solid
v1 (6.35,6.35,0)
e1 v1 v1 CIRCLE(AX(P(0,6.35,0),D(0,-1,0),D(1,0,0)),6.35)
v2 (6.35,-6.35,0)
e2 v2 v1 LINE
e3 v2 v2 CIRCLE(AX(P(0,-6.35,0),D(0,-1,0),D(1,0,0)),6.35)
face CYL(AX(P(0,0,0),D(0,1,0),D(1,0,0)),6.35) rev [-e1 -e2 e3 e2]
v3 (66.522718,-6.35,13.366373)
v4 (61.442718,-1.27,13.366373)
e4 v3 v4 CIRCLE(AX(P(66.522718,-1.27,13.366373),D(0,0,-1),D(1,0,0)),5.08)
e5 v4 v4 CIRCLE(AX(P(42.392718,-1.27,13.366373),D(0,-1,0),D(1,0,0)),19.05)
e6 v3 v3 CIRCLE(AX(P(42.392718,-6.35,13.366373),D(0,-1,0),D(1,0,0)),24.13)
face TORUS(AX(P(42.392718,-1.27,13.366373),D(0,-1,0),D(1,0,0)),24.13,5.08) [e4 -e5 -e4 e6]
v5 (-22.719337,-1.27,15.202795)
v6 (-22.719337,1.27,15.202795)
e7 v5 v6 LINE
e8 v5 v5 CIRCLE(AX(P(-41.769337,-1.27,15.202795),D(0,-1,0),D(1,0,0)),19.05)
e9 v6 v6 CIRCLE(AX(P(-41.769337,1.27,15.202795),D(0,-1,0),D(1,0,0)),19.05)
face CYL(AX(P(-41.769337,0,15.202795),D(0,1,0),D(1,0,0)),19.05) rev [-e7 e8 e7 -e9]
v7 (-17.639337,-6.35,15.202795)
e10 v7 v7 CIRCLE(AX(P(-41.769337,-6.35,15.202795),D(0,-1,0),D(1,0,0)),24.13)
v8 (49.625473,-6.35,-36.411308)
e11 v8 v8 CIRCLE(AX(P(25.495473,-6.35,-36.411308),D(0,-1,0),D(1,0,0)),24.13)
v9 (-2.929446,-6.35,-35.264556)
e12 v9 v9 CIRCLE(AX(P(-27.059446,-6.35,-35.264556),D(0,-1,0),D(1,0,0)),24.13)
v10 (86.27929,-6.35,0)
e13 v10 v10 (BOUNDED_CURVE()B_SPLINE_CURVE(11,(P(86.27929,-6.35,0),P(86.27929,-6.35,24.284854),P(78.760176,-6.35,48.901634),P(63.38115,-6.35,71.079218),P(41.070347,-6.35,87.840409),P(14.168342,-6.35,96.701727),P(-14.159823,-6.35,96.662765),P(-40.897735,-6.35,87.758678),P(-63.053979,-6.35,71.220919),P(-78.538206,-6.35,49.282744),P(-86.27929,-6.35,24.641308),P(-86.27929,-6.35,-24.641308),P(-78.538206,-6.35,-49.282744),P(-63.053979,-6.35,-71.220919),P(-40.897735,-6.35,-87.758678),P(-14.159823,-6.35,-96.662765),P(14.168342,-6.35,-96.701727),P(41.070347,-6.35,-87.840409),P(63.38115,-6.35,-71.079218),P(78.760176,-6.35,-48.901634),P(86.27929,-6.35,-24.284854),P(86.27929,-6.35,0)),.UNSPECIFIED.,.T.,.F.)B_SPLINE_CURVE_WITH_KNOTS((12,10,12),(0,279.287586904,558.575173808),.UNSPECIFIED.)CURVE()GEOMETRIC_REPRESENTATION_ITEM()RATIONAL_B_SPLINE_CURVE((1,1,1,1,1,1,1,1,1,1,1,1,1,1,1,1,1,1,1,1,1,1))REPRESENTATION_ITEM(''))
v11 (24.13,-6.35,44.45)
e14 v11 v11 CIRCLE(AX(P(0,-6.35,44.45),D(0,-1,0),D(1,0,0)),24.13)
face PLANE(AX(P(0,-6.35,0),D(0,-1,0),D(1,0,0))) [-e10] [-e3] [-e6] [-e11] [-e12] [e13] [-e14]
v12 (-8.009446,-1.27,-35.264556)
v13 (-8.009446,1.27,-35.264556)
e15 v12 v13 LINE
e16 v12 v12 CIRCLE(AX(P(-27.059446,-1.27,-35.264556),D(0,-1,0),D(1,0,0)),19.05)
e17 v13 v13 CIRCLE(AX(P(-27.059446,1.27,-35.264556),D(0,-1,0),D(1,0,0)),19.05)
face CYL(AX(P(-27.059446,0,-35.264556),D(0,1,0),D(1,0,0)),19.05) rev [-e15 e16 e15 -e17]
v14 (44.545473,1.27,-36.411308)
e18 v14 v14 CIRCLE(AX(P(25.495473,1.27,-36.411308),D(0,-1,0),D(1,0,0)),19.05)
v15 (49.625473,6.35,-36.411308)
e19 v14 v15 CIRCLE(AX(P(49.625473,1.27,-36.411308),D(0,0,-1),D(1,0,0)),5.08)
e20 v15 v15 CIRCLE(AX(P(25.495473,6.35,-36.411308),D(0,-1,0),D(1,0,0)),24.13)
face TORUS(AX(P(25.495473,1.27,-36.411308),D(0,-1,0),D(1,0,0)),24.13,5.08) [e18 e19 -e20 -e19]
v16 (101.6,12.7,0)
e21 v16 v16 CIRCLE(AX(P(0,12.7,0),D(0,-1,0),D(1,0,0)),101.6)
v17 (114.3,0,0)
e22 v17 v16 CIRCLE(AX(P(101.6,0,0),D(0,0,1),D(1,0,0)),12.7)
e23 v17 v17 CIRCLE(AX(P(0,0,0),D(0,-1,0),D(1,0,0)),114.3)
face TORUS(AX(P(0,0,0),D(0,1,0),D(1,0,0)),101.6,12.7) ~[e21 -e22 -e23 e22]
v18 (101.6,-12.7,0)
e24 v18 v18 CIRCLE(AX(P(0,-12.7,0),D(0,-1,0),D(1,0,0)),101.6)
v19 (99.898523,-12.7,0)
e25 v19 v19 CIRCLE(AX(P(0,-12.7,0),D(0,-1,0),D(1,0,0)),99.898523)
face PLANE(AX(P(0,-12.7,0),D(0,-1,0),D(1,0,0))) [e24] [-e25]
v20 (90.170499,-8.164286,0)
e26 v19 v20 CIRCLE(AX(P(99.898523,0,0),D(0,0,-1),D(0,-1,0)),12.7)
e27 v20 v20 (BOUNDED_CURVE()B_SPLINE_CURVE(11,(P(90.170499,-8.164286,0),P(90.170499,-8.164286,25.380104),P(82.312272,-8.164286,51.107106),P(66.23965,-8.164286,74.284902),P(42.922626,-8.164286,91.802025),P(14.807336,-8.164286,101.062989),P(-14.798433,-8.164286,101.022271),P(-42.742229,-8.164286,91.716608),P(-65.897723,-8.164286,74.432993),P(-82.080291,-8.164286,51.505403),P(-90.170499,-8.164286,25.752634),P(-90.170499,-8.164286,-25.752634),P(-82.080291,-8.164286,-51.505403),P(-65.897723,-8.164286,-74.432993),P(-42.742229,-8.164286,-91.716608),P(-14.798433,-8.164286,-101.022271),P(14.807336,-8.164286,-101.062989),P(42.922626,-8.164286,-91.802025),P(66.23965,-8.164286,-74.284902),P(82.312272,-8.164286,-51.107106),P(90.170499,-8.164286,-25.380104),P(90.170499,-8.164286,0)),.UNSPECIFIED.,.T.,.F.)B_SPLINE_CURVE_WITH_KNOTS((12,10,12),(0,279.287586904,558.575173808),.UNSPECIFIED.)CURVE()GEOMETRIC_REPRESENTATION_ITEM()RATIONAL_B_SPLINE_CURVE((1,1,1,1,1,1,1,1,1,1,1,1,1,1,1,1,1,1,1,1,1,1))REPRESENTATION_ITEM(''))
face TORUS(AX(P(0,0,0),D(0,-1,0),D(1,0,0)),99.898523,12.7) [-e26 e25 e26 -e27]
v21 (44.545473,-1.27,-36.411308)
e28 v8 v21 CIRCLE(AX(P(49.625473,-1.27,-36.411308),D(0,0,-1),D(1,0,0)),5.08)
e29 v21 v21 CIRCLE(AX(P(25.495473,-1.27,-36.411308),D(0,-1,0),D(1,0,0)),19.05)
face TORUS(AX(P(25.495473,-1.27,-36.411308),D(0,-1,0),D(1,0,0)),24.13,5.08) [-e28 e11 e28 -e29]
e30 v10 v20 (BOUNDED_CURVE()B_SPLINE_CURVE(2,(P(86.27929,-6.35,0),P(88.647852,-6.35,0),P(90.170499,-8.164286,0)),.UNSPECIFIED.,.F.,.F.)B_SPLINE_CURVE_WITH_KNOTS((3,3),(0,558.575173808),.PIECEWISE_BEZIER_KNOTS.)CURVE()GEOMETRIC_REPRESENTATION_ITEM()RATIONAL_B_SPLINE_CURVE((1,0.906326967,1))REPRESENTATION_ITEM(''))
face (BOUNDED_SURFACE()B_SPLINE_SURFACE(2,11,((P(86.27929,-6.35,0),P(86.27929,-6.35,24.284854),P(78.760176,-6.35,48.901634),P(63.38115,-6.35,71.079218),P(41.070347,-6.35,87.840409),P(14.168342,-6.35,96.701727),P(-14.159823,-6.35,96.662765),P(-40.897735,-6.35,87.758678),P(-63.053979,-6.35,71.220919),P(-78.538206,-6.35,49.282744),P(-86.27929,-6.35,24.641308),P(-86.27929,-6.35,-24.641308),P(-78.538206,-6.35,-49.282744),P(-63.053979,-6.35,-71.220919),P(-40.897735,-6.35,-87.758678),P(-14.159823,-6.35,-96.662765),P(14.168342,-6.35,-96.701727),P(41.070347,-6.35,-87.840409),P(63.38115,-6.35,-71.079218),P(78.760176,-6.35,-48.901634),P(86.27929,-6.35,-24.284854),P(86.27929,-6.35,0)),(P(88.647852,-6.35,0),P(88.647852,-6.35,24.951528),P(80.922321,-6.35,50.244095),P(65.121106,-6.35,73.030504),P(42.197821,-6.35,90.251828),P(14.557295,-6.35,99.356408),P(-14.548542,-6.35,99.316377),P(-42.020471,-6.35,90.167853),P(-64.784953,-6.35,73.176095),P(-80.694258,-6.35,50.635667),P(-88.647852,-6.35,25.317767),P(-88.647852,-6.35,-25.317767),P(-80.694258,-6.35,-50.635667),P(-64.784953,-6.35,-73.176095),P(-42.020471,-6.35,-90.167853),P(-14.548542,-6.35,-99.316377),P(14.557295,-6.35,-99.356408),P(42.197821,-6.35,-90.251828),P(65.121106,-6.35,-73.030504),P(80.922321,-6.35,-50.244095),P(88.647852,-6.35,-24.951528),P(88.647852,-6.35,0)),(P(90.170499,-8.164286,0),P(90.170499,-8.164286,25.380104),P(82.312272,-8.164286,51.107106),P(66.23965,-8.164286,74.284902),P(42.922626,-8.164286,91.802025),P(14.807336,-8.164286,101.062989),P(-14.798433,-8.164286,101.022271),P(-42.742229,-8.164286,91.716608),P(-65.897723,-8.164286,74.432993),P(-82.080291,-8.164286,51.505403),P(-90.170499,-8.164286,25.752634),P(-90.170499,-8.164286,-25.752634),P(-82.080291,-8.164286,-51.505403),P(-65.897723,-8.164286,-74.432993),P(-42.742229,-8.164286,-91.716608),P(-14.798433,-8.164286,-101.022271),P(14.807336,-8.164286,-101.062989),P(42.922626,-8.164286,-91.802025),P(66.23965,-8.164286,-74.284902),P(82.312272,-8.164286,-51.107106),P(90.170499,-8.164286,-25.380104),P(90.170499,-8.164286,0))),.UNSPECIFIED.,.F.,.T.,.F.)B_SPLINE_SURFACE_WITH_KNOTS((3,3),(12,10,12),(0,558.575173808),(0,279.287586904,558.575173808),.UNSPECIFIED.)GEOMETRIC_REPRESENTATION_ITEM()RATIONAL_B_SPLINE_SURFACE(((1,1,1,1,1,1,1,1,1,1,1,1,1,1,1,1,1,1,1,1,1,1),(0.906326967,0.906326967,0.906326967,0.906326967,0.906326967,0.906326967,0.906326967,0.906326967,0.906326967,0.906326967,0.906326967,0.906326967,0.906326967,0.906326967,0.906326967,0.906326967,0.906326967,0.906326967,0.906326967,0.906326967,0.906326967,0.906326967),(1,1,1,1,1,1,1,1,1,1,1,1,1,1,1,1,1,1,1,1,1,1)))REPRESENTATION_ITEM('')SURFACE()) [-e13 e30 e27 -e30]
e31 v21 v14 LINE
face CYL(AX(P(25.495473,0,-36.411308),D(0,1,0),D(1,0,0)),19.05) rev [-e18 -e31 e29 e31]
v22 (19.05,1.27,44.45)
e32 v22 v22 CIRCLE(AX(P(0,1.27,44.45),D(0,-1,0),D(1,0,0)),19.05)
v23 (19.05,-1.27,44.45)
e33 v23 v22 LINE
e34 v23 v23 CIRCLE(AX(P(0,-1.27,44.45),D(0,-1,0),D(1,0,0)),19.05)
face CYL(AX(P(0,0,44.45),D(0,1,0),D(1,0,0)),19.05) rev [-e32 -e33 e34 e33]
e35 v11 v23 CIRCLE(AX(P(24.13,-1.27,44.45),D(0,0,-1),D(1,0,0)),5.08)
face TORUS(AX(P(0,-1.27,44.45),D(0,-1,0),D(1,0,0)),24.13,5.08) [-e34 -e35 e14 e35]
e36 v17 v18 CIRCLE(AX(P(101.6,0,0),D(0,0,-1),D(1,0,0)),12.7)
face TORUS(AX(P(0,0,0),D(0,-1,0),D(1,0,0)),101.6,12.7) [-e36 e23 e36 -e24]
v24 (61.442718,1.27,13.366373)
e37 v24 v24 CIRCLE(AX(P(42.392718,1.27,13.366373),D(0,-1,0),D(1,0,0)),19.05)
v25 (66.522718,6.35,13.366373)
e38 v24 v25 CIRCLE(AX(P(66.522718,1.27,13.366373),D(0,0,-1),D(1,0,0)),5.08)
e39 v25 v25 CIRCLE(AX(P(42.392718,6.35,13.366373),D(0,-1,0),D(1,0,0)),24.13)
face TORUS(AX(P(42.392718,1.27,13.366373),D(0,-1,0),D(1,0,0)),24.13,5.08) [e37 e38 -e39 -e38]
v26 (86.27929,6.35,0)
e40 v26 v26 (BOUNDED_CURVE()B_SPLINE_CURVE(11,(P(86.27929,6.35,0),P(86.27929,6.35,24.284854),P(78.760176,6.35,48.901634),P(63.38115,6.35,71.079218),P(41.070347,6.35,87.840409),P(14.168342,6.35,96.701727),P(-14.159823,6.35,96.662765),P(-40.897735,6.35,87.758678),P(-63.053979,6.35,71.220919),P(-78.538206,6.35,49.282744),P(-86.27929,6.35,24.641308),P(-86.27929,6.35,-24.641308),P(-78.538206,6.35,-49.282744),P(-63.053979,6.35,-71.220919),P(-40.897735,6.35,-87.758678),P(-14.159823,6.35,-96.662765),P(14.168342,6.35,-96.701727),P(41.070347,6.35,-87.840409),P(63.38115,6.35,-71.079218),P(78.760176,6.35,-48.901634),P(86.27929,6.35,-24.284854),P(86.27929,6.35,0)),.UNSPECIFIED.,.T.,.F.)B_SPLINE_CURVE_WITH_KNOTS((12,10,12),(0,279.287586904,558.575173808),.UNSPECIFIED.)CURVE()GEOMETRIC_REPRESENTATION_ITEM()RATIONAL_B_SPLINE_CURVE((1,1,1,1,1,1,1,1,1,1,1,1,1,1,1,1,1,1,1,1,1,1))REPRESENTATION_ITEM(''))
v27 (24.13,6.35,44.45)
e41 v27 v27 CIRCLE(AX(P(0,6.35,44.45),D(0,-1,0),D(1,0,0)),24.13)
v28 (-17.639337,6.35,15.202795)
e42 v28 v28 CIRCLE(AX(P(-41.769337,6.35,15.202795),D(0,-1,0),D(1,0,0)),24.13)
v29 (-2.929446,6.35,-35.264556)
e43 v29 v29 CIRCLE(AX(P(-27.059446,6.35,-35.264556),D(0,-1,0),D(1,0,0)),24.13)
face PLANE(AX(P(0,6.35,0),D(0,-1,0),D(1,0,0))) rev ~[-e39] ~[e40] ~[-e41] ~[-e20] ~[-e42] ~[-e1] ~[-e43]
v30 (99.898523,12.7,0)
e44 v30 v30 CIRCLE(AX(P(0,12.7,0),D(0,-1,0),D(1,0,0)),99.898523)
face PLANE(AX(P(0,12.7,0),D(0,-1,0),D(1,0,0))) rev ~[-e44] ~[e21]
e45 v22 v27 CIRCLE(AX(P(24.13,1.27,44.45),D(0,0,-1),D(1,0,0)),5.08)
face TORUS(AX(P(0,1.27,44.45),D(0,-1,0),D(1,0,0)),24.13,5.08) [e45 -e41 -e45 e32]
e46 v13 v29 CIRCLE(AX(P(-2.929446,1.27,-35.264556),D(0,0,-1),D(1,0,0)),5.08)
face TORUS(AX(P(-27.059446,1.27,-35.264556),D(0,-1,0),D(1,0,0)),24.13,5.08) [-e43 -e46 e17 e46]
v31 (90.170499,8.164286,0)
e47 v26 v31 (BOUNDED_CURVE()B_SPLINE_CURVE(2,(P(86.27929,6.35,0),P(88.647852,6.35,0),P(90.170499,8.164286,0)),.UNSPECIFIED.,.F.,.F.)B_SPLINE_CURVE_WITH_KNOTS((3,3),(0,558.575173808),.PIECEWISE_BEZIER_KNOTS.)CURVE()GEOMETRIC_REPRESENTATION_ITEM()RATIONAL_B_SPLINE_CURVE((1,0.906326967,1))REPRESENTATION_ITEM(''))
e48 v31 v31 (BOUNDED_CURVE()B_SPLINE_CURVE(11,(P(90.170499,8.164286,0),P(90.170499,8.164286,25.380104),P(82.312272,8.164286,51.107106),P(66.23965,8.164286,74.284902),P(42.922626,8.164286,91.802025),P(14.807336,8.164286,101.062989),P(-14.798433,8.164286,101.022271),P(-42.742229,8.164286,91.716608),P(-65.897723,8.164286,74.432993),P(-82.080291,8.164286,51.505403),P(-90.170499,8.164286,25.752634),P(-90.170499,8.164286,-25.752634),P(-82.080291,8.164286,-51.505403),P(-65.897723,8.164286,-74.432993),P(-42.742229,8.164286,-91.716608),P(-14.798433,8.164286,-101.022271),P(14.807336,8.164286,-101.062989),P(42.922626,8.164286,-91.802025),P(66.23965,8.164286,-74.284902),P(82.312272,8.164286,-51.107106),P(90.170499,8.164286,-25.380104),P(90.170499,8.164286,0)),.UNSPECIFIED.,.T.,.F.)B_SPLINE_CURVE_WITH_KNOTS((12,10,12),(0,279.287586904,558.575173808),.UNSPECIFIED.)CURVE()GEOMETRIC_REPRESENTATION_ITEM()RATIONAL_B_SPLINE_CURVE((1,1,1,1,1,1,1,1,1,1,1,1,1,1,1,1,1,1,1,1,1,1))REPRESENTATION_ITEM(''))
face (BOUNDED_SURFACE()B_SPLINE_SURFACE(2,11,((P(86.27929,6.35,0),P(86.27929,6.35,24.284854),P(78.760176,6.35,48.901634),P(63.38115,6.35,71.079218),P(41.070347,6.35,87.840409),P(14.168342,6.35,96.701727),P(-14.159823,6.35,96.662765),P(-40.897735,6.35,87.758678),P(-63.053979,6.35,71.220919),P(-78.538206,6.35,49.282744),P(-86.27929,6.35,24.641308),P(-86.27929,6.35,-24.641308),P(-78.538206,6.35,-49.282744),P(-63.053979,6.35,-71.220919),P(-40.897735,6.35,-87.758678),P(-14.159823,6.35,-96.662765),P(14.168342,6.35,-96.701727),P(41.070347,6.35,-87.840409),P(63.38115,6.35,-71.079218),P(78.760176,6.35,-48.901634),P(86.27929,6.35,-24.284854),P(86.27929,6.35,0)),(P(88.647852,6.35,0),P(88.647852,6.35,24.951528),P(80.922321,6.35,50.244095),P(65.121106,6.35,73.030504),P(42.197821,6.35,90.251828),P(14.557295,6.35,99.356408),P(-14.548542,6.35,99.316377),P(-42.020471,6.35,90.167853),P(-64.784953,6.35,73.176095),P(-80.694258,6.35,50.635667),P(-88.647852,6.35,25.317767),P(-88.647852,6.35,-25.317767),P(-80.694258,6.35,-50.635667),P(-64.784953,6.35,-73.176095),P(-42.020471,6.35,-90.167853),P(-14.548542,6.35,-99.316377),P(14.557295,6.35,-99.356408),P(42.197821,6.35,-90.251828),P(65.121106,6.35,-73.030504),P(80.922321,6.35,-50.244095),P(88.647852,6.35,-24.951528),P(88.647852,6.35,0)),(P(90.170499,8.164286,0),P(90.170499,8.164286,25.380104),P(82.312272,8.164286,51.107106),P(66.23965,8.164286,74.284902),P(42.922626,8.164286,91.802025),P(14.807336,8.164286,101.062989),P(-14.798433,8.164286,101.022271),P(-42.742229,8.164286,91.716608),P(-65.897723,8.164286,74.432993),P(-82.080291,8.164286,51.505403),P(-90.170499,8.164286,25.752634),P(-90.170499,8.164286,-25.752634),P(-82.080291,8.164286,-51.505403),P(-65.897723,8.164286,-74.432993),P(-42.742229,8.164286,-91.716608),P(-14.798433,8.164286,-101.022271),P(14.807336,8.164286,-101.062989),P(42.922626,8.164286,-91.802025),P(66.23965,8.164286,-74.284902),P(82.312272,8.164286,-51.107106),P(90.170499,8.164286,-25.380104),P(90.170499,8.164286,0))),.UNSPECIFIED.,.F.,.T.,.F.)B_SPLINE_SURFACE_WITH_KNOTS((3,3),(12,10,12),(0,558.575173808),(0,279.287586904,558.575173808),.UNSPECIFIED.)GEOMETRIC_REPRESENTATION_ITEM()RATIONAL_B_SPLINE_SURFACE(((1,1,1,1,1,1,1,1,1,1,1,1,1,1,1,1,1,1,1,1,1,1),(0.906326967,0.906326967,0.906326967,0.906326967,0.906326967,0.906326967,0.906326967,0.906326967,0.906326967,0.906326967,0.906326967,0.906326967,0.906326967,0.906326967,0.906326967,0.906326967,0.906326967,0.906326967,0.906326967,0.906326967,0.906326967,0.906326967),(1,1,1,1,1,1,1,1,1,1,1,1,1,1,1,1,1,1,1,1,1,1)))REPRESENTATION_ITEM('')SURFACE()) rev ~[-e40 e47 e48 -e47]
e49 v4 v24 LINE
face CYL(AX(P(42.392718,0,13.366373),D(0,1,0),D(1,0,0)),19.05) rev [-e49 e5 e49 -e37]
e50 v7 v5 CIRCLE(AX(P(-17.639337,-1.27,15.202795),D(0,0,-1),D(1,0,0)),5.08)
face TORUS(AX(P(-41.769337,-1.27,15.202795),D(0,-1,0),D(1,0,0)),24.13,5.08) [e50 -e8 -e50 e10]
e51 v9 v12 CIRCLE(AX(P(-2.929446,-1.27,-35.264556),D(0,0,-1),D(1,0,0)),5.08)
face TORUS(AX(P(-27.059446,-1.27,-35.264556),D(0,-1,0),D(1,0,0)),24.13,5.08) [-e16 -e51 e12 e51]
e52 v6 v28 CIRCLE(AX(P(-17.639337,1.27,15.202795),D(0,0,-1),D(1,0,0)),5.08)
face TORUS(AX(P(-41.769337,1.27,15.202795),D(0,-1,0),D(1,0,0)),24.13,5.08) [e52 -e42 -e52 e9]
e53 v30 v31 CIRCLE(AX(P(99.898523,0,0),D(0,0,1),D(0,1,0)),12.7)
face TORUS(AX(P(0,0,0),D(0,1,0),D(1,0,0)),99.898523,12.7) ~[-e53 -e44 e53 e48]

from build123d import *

# Parameters (mm, degrees)
F0_R     = 114.3
F0_R_2   = 88.9
F1_DEPTH = 12.7
F0_R_3   = 19.05
F0_R_4   = 6.35
F2_DEPTH = 6.35
F4_R     = 5.08
F5_R     = 5.08


# Not quite as in the source:
# - a fillet or chamfer that OpenCascade refuses, or shapes differently, is made with other operations: its cross-section is extruded or revolved along the edge and cut away or added


with BuildPart() as f1:
    # F0 (on Front) → F1 (new body, symmetric)
    with BuildSketch(Plane.XZ):
        Circle(F0_R)
        Circle(F0_R_2, mode=Mode.SUBTRACT)
    extrude(amount=F1_DEPTH, both=True)

    # F0 (on Front) → F2 (join, symmetric)
    with BuildSketch(Plane.XZ):
        Circle(F0_R_2)
        with Locations((-27.0594455194, -35.2645559759)):
            Circle(F0_R_3, mode=Mode.SUBTRACT)
        with Locations((25.4954725958, -36.4113083686)):
            Circle(F0_R_3, mode=Mode.SUBTRACT)
        with Locations((-41.7693369939, 15.2027953708)):
            Circle(F0_R_3, mode=Mode.SUBTRACT)
        Circle(F0_R_4, mode=Mode.SUBTRACT)
        with Locations((42.3927184608, 13.366372788)):
            Circle(F0_R_3, mode=Mode.SUBTRACT)
        with Locations((0, 44.45)):
            Circle(F0_R_3, mode=Mode.SUBTRACT)
    extrude(amount=F2_DEPTH, both=True)

    # F3: fillet of radius 12.7 on 4 edges, made by hand

    # F3_s1 → F3_t2 (revolve, cut)
    with BuildSketch(Plane.XY):
        with BuildLine():
            ThreePointArc((114.3, 0), (110.5802561211, -8.9802561211), (101.6, -12.7))
            Line((101.6, -12.7), (114.3, -12.7))
            Line((114.3, -12.7), (114.3, 0))
        make_face()
    revolve(axis=Axis((0, -12.7, 0), (0, -1, 0)), mode=Mode.SUBTRACT)

    # F3_s3 → F3_t4 (revolve, cut)
    with BuildSketch(Plane.XY):
        with BuildLine():
            ThreePointArc((114.3, 0), (110.5802561211, 8.9802561211), (101.6, 12.7))
            Line((101.6, 12.7), (114.3, 12.7))
            Line((114.3, 12.7), (114.3, 0))
        make_face()
    revolve(axis=Axis((0, 12.7, 0), (0, -1, 0)), mode=Mode.SUBTRACT)

    # F3_s5 → F3_t6 (revolve, cut)
    with BuildSketch(Plane.XY):
        with BuildLine():
            ThreePointArc((99.8985226281, 12.7), (93.5485226281, 10.9985226281), (88.9, 6.35))
            Line((88.9, 6.35), (88.9, 12.7))
            Line((88.9, 12.7), (99.8985226281, 12.7))
        make_face()
    revolve(axis=Axis((0, 12.7, 0), (0, -1, 0)), mode=Mode.SUBTRACT)

    # F3_s7 → F3_t8 (revolve, cut)
    with BuildSketch(Plane.XY):
        with BuildLine():
            ThreePointArc((99.8985226281, -12.7), (93.5485226281, -10.9985226281), (88.9, -6.35))
            Line((88.9, -6.35), (88.9, -12.7))
            Line((88.9, -12.7), (99.8985226281, -12.7))
        make_face()
    revolve(axis=Axis((0, -12.7, 0), (0, -1, 0)), mode=Mode.SUBTRACT)

    # F4
    f4_edges = [f1.edges().sort_by_distance(p)[0] for p in [
        (6.445473, -6.35, -36.411308),
        (6.445473, 6.35, -36.411308),
        (-46.109446, -6.35, -35.264556),
        (-46.109446, 6.35, -35.264556),
        (-60.819337, -6.35, 15.202795),
        (-60.819337, 6.35, 15.202795),
        (-19.05, -6.35, 44.45),
        (-19.05, 6.35, 44.45),
        (23.342718, 6.35, 13.366373),
        (23.342718, -6.35, 13.366373),
    ]]
    fillet(f4_edges, radius=F4_R)

    # F5
    f5_edges = [f1.edges().sort_by_distance(p)[0] for p in [
        (-88.9, -6.35, 0),
        (-88.9, 6.35, 0),
    ]]
    fillet(f5_edges, radius=F5_R)


solid = f1.part
